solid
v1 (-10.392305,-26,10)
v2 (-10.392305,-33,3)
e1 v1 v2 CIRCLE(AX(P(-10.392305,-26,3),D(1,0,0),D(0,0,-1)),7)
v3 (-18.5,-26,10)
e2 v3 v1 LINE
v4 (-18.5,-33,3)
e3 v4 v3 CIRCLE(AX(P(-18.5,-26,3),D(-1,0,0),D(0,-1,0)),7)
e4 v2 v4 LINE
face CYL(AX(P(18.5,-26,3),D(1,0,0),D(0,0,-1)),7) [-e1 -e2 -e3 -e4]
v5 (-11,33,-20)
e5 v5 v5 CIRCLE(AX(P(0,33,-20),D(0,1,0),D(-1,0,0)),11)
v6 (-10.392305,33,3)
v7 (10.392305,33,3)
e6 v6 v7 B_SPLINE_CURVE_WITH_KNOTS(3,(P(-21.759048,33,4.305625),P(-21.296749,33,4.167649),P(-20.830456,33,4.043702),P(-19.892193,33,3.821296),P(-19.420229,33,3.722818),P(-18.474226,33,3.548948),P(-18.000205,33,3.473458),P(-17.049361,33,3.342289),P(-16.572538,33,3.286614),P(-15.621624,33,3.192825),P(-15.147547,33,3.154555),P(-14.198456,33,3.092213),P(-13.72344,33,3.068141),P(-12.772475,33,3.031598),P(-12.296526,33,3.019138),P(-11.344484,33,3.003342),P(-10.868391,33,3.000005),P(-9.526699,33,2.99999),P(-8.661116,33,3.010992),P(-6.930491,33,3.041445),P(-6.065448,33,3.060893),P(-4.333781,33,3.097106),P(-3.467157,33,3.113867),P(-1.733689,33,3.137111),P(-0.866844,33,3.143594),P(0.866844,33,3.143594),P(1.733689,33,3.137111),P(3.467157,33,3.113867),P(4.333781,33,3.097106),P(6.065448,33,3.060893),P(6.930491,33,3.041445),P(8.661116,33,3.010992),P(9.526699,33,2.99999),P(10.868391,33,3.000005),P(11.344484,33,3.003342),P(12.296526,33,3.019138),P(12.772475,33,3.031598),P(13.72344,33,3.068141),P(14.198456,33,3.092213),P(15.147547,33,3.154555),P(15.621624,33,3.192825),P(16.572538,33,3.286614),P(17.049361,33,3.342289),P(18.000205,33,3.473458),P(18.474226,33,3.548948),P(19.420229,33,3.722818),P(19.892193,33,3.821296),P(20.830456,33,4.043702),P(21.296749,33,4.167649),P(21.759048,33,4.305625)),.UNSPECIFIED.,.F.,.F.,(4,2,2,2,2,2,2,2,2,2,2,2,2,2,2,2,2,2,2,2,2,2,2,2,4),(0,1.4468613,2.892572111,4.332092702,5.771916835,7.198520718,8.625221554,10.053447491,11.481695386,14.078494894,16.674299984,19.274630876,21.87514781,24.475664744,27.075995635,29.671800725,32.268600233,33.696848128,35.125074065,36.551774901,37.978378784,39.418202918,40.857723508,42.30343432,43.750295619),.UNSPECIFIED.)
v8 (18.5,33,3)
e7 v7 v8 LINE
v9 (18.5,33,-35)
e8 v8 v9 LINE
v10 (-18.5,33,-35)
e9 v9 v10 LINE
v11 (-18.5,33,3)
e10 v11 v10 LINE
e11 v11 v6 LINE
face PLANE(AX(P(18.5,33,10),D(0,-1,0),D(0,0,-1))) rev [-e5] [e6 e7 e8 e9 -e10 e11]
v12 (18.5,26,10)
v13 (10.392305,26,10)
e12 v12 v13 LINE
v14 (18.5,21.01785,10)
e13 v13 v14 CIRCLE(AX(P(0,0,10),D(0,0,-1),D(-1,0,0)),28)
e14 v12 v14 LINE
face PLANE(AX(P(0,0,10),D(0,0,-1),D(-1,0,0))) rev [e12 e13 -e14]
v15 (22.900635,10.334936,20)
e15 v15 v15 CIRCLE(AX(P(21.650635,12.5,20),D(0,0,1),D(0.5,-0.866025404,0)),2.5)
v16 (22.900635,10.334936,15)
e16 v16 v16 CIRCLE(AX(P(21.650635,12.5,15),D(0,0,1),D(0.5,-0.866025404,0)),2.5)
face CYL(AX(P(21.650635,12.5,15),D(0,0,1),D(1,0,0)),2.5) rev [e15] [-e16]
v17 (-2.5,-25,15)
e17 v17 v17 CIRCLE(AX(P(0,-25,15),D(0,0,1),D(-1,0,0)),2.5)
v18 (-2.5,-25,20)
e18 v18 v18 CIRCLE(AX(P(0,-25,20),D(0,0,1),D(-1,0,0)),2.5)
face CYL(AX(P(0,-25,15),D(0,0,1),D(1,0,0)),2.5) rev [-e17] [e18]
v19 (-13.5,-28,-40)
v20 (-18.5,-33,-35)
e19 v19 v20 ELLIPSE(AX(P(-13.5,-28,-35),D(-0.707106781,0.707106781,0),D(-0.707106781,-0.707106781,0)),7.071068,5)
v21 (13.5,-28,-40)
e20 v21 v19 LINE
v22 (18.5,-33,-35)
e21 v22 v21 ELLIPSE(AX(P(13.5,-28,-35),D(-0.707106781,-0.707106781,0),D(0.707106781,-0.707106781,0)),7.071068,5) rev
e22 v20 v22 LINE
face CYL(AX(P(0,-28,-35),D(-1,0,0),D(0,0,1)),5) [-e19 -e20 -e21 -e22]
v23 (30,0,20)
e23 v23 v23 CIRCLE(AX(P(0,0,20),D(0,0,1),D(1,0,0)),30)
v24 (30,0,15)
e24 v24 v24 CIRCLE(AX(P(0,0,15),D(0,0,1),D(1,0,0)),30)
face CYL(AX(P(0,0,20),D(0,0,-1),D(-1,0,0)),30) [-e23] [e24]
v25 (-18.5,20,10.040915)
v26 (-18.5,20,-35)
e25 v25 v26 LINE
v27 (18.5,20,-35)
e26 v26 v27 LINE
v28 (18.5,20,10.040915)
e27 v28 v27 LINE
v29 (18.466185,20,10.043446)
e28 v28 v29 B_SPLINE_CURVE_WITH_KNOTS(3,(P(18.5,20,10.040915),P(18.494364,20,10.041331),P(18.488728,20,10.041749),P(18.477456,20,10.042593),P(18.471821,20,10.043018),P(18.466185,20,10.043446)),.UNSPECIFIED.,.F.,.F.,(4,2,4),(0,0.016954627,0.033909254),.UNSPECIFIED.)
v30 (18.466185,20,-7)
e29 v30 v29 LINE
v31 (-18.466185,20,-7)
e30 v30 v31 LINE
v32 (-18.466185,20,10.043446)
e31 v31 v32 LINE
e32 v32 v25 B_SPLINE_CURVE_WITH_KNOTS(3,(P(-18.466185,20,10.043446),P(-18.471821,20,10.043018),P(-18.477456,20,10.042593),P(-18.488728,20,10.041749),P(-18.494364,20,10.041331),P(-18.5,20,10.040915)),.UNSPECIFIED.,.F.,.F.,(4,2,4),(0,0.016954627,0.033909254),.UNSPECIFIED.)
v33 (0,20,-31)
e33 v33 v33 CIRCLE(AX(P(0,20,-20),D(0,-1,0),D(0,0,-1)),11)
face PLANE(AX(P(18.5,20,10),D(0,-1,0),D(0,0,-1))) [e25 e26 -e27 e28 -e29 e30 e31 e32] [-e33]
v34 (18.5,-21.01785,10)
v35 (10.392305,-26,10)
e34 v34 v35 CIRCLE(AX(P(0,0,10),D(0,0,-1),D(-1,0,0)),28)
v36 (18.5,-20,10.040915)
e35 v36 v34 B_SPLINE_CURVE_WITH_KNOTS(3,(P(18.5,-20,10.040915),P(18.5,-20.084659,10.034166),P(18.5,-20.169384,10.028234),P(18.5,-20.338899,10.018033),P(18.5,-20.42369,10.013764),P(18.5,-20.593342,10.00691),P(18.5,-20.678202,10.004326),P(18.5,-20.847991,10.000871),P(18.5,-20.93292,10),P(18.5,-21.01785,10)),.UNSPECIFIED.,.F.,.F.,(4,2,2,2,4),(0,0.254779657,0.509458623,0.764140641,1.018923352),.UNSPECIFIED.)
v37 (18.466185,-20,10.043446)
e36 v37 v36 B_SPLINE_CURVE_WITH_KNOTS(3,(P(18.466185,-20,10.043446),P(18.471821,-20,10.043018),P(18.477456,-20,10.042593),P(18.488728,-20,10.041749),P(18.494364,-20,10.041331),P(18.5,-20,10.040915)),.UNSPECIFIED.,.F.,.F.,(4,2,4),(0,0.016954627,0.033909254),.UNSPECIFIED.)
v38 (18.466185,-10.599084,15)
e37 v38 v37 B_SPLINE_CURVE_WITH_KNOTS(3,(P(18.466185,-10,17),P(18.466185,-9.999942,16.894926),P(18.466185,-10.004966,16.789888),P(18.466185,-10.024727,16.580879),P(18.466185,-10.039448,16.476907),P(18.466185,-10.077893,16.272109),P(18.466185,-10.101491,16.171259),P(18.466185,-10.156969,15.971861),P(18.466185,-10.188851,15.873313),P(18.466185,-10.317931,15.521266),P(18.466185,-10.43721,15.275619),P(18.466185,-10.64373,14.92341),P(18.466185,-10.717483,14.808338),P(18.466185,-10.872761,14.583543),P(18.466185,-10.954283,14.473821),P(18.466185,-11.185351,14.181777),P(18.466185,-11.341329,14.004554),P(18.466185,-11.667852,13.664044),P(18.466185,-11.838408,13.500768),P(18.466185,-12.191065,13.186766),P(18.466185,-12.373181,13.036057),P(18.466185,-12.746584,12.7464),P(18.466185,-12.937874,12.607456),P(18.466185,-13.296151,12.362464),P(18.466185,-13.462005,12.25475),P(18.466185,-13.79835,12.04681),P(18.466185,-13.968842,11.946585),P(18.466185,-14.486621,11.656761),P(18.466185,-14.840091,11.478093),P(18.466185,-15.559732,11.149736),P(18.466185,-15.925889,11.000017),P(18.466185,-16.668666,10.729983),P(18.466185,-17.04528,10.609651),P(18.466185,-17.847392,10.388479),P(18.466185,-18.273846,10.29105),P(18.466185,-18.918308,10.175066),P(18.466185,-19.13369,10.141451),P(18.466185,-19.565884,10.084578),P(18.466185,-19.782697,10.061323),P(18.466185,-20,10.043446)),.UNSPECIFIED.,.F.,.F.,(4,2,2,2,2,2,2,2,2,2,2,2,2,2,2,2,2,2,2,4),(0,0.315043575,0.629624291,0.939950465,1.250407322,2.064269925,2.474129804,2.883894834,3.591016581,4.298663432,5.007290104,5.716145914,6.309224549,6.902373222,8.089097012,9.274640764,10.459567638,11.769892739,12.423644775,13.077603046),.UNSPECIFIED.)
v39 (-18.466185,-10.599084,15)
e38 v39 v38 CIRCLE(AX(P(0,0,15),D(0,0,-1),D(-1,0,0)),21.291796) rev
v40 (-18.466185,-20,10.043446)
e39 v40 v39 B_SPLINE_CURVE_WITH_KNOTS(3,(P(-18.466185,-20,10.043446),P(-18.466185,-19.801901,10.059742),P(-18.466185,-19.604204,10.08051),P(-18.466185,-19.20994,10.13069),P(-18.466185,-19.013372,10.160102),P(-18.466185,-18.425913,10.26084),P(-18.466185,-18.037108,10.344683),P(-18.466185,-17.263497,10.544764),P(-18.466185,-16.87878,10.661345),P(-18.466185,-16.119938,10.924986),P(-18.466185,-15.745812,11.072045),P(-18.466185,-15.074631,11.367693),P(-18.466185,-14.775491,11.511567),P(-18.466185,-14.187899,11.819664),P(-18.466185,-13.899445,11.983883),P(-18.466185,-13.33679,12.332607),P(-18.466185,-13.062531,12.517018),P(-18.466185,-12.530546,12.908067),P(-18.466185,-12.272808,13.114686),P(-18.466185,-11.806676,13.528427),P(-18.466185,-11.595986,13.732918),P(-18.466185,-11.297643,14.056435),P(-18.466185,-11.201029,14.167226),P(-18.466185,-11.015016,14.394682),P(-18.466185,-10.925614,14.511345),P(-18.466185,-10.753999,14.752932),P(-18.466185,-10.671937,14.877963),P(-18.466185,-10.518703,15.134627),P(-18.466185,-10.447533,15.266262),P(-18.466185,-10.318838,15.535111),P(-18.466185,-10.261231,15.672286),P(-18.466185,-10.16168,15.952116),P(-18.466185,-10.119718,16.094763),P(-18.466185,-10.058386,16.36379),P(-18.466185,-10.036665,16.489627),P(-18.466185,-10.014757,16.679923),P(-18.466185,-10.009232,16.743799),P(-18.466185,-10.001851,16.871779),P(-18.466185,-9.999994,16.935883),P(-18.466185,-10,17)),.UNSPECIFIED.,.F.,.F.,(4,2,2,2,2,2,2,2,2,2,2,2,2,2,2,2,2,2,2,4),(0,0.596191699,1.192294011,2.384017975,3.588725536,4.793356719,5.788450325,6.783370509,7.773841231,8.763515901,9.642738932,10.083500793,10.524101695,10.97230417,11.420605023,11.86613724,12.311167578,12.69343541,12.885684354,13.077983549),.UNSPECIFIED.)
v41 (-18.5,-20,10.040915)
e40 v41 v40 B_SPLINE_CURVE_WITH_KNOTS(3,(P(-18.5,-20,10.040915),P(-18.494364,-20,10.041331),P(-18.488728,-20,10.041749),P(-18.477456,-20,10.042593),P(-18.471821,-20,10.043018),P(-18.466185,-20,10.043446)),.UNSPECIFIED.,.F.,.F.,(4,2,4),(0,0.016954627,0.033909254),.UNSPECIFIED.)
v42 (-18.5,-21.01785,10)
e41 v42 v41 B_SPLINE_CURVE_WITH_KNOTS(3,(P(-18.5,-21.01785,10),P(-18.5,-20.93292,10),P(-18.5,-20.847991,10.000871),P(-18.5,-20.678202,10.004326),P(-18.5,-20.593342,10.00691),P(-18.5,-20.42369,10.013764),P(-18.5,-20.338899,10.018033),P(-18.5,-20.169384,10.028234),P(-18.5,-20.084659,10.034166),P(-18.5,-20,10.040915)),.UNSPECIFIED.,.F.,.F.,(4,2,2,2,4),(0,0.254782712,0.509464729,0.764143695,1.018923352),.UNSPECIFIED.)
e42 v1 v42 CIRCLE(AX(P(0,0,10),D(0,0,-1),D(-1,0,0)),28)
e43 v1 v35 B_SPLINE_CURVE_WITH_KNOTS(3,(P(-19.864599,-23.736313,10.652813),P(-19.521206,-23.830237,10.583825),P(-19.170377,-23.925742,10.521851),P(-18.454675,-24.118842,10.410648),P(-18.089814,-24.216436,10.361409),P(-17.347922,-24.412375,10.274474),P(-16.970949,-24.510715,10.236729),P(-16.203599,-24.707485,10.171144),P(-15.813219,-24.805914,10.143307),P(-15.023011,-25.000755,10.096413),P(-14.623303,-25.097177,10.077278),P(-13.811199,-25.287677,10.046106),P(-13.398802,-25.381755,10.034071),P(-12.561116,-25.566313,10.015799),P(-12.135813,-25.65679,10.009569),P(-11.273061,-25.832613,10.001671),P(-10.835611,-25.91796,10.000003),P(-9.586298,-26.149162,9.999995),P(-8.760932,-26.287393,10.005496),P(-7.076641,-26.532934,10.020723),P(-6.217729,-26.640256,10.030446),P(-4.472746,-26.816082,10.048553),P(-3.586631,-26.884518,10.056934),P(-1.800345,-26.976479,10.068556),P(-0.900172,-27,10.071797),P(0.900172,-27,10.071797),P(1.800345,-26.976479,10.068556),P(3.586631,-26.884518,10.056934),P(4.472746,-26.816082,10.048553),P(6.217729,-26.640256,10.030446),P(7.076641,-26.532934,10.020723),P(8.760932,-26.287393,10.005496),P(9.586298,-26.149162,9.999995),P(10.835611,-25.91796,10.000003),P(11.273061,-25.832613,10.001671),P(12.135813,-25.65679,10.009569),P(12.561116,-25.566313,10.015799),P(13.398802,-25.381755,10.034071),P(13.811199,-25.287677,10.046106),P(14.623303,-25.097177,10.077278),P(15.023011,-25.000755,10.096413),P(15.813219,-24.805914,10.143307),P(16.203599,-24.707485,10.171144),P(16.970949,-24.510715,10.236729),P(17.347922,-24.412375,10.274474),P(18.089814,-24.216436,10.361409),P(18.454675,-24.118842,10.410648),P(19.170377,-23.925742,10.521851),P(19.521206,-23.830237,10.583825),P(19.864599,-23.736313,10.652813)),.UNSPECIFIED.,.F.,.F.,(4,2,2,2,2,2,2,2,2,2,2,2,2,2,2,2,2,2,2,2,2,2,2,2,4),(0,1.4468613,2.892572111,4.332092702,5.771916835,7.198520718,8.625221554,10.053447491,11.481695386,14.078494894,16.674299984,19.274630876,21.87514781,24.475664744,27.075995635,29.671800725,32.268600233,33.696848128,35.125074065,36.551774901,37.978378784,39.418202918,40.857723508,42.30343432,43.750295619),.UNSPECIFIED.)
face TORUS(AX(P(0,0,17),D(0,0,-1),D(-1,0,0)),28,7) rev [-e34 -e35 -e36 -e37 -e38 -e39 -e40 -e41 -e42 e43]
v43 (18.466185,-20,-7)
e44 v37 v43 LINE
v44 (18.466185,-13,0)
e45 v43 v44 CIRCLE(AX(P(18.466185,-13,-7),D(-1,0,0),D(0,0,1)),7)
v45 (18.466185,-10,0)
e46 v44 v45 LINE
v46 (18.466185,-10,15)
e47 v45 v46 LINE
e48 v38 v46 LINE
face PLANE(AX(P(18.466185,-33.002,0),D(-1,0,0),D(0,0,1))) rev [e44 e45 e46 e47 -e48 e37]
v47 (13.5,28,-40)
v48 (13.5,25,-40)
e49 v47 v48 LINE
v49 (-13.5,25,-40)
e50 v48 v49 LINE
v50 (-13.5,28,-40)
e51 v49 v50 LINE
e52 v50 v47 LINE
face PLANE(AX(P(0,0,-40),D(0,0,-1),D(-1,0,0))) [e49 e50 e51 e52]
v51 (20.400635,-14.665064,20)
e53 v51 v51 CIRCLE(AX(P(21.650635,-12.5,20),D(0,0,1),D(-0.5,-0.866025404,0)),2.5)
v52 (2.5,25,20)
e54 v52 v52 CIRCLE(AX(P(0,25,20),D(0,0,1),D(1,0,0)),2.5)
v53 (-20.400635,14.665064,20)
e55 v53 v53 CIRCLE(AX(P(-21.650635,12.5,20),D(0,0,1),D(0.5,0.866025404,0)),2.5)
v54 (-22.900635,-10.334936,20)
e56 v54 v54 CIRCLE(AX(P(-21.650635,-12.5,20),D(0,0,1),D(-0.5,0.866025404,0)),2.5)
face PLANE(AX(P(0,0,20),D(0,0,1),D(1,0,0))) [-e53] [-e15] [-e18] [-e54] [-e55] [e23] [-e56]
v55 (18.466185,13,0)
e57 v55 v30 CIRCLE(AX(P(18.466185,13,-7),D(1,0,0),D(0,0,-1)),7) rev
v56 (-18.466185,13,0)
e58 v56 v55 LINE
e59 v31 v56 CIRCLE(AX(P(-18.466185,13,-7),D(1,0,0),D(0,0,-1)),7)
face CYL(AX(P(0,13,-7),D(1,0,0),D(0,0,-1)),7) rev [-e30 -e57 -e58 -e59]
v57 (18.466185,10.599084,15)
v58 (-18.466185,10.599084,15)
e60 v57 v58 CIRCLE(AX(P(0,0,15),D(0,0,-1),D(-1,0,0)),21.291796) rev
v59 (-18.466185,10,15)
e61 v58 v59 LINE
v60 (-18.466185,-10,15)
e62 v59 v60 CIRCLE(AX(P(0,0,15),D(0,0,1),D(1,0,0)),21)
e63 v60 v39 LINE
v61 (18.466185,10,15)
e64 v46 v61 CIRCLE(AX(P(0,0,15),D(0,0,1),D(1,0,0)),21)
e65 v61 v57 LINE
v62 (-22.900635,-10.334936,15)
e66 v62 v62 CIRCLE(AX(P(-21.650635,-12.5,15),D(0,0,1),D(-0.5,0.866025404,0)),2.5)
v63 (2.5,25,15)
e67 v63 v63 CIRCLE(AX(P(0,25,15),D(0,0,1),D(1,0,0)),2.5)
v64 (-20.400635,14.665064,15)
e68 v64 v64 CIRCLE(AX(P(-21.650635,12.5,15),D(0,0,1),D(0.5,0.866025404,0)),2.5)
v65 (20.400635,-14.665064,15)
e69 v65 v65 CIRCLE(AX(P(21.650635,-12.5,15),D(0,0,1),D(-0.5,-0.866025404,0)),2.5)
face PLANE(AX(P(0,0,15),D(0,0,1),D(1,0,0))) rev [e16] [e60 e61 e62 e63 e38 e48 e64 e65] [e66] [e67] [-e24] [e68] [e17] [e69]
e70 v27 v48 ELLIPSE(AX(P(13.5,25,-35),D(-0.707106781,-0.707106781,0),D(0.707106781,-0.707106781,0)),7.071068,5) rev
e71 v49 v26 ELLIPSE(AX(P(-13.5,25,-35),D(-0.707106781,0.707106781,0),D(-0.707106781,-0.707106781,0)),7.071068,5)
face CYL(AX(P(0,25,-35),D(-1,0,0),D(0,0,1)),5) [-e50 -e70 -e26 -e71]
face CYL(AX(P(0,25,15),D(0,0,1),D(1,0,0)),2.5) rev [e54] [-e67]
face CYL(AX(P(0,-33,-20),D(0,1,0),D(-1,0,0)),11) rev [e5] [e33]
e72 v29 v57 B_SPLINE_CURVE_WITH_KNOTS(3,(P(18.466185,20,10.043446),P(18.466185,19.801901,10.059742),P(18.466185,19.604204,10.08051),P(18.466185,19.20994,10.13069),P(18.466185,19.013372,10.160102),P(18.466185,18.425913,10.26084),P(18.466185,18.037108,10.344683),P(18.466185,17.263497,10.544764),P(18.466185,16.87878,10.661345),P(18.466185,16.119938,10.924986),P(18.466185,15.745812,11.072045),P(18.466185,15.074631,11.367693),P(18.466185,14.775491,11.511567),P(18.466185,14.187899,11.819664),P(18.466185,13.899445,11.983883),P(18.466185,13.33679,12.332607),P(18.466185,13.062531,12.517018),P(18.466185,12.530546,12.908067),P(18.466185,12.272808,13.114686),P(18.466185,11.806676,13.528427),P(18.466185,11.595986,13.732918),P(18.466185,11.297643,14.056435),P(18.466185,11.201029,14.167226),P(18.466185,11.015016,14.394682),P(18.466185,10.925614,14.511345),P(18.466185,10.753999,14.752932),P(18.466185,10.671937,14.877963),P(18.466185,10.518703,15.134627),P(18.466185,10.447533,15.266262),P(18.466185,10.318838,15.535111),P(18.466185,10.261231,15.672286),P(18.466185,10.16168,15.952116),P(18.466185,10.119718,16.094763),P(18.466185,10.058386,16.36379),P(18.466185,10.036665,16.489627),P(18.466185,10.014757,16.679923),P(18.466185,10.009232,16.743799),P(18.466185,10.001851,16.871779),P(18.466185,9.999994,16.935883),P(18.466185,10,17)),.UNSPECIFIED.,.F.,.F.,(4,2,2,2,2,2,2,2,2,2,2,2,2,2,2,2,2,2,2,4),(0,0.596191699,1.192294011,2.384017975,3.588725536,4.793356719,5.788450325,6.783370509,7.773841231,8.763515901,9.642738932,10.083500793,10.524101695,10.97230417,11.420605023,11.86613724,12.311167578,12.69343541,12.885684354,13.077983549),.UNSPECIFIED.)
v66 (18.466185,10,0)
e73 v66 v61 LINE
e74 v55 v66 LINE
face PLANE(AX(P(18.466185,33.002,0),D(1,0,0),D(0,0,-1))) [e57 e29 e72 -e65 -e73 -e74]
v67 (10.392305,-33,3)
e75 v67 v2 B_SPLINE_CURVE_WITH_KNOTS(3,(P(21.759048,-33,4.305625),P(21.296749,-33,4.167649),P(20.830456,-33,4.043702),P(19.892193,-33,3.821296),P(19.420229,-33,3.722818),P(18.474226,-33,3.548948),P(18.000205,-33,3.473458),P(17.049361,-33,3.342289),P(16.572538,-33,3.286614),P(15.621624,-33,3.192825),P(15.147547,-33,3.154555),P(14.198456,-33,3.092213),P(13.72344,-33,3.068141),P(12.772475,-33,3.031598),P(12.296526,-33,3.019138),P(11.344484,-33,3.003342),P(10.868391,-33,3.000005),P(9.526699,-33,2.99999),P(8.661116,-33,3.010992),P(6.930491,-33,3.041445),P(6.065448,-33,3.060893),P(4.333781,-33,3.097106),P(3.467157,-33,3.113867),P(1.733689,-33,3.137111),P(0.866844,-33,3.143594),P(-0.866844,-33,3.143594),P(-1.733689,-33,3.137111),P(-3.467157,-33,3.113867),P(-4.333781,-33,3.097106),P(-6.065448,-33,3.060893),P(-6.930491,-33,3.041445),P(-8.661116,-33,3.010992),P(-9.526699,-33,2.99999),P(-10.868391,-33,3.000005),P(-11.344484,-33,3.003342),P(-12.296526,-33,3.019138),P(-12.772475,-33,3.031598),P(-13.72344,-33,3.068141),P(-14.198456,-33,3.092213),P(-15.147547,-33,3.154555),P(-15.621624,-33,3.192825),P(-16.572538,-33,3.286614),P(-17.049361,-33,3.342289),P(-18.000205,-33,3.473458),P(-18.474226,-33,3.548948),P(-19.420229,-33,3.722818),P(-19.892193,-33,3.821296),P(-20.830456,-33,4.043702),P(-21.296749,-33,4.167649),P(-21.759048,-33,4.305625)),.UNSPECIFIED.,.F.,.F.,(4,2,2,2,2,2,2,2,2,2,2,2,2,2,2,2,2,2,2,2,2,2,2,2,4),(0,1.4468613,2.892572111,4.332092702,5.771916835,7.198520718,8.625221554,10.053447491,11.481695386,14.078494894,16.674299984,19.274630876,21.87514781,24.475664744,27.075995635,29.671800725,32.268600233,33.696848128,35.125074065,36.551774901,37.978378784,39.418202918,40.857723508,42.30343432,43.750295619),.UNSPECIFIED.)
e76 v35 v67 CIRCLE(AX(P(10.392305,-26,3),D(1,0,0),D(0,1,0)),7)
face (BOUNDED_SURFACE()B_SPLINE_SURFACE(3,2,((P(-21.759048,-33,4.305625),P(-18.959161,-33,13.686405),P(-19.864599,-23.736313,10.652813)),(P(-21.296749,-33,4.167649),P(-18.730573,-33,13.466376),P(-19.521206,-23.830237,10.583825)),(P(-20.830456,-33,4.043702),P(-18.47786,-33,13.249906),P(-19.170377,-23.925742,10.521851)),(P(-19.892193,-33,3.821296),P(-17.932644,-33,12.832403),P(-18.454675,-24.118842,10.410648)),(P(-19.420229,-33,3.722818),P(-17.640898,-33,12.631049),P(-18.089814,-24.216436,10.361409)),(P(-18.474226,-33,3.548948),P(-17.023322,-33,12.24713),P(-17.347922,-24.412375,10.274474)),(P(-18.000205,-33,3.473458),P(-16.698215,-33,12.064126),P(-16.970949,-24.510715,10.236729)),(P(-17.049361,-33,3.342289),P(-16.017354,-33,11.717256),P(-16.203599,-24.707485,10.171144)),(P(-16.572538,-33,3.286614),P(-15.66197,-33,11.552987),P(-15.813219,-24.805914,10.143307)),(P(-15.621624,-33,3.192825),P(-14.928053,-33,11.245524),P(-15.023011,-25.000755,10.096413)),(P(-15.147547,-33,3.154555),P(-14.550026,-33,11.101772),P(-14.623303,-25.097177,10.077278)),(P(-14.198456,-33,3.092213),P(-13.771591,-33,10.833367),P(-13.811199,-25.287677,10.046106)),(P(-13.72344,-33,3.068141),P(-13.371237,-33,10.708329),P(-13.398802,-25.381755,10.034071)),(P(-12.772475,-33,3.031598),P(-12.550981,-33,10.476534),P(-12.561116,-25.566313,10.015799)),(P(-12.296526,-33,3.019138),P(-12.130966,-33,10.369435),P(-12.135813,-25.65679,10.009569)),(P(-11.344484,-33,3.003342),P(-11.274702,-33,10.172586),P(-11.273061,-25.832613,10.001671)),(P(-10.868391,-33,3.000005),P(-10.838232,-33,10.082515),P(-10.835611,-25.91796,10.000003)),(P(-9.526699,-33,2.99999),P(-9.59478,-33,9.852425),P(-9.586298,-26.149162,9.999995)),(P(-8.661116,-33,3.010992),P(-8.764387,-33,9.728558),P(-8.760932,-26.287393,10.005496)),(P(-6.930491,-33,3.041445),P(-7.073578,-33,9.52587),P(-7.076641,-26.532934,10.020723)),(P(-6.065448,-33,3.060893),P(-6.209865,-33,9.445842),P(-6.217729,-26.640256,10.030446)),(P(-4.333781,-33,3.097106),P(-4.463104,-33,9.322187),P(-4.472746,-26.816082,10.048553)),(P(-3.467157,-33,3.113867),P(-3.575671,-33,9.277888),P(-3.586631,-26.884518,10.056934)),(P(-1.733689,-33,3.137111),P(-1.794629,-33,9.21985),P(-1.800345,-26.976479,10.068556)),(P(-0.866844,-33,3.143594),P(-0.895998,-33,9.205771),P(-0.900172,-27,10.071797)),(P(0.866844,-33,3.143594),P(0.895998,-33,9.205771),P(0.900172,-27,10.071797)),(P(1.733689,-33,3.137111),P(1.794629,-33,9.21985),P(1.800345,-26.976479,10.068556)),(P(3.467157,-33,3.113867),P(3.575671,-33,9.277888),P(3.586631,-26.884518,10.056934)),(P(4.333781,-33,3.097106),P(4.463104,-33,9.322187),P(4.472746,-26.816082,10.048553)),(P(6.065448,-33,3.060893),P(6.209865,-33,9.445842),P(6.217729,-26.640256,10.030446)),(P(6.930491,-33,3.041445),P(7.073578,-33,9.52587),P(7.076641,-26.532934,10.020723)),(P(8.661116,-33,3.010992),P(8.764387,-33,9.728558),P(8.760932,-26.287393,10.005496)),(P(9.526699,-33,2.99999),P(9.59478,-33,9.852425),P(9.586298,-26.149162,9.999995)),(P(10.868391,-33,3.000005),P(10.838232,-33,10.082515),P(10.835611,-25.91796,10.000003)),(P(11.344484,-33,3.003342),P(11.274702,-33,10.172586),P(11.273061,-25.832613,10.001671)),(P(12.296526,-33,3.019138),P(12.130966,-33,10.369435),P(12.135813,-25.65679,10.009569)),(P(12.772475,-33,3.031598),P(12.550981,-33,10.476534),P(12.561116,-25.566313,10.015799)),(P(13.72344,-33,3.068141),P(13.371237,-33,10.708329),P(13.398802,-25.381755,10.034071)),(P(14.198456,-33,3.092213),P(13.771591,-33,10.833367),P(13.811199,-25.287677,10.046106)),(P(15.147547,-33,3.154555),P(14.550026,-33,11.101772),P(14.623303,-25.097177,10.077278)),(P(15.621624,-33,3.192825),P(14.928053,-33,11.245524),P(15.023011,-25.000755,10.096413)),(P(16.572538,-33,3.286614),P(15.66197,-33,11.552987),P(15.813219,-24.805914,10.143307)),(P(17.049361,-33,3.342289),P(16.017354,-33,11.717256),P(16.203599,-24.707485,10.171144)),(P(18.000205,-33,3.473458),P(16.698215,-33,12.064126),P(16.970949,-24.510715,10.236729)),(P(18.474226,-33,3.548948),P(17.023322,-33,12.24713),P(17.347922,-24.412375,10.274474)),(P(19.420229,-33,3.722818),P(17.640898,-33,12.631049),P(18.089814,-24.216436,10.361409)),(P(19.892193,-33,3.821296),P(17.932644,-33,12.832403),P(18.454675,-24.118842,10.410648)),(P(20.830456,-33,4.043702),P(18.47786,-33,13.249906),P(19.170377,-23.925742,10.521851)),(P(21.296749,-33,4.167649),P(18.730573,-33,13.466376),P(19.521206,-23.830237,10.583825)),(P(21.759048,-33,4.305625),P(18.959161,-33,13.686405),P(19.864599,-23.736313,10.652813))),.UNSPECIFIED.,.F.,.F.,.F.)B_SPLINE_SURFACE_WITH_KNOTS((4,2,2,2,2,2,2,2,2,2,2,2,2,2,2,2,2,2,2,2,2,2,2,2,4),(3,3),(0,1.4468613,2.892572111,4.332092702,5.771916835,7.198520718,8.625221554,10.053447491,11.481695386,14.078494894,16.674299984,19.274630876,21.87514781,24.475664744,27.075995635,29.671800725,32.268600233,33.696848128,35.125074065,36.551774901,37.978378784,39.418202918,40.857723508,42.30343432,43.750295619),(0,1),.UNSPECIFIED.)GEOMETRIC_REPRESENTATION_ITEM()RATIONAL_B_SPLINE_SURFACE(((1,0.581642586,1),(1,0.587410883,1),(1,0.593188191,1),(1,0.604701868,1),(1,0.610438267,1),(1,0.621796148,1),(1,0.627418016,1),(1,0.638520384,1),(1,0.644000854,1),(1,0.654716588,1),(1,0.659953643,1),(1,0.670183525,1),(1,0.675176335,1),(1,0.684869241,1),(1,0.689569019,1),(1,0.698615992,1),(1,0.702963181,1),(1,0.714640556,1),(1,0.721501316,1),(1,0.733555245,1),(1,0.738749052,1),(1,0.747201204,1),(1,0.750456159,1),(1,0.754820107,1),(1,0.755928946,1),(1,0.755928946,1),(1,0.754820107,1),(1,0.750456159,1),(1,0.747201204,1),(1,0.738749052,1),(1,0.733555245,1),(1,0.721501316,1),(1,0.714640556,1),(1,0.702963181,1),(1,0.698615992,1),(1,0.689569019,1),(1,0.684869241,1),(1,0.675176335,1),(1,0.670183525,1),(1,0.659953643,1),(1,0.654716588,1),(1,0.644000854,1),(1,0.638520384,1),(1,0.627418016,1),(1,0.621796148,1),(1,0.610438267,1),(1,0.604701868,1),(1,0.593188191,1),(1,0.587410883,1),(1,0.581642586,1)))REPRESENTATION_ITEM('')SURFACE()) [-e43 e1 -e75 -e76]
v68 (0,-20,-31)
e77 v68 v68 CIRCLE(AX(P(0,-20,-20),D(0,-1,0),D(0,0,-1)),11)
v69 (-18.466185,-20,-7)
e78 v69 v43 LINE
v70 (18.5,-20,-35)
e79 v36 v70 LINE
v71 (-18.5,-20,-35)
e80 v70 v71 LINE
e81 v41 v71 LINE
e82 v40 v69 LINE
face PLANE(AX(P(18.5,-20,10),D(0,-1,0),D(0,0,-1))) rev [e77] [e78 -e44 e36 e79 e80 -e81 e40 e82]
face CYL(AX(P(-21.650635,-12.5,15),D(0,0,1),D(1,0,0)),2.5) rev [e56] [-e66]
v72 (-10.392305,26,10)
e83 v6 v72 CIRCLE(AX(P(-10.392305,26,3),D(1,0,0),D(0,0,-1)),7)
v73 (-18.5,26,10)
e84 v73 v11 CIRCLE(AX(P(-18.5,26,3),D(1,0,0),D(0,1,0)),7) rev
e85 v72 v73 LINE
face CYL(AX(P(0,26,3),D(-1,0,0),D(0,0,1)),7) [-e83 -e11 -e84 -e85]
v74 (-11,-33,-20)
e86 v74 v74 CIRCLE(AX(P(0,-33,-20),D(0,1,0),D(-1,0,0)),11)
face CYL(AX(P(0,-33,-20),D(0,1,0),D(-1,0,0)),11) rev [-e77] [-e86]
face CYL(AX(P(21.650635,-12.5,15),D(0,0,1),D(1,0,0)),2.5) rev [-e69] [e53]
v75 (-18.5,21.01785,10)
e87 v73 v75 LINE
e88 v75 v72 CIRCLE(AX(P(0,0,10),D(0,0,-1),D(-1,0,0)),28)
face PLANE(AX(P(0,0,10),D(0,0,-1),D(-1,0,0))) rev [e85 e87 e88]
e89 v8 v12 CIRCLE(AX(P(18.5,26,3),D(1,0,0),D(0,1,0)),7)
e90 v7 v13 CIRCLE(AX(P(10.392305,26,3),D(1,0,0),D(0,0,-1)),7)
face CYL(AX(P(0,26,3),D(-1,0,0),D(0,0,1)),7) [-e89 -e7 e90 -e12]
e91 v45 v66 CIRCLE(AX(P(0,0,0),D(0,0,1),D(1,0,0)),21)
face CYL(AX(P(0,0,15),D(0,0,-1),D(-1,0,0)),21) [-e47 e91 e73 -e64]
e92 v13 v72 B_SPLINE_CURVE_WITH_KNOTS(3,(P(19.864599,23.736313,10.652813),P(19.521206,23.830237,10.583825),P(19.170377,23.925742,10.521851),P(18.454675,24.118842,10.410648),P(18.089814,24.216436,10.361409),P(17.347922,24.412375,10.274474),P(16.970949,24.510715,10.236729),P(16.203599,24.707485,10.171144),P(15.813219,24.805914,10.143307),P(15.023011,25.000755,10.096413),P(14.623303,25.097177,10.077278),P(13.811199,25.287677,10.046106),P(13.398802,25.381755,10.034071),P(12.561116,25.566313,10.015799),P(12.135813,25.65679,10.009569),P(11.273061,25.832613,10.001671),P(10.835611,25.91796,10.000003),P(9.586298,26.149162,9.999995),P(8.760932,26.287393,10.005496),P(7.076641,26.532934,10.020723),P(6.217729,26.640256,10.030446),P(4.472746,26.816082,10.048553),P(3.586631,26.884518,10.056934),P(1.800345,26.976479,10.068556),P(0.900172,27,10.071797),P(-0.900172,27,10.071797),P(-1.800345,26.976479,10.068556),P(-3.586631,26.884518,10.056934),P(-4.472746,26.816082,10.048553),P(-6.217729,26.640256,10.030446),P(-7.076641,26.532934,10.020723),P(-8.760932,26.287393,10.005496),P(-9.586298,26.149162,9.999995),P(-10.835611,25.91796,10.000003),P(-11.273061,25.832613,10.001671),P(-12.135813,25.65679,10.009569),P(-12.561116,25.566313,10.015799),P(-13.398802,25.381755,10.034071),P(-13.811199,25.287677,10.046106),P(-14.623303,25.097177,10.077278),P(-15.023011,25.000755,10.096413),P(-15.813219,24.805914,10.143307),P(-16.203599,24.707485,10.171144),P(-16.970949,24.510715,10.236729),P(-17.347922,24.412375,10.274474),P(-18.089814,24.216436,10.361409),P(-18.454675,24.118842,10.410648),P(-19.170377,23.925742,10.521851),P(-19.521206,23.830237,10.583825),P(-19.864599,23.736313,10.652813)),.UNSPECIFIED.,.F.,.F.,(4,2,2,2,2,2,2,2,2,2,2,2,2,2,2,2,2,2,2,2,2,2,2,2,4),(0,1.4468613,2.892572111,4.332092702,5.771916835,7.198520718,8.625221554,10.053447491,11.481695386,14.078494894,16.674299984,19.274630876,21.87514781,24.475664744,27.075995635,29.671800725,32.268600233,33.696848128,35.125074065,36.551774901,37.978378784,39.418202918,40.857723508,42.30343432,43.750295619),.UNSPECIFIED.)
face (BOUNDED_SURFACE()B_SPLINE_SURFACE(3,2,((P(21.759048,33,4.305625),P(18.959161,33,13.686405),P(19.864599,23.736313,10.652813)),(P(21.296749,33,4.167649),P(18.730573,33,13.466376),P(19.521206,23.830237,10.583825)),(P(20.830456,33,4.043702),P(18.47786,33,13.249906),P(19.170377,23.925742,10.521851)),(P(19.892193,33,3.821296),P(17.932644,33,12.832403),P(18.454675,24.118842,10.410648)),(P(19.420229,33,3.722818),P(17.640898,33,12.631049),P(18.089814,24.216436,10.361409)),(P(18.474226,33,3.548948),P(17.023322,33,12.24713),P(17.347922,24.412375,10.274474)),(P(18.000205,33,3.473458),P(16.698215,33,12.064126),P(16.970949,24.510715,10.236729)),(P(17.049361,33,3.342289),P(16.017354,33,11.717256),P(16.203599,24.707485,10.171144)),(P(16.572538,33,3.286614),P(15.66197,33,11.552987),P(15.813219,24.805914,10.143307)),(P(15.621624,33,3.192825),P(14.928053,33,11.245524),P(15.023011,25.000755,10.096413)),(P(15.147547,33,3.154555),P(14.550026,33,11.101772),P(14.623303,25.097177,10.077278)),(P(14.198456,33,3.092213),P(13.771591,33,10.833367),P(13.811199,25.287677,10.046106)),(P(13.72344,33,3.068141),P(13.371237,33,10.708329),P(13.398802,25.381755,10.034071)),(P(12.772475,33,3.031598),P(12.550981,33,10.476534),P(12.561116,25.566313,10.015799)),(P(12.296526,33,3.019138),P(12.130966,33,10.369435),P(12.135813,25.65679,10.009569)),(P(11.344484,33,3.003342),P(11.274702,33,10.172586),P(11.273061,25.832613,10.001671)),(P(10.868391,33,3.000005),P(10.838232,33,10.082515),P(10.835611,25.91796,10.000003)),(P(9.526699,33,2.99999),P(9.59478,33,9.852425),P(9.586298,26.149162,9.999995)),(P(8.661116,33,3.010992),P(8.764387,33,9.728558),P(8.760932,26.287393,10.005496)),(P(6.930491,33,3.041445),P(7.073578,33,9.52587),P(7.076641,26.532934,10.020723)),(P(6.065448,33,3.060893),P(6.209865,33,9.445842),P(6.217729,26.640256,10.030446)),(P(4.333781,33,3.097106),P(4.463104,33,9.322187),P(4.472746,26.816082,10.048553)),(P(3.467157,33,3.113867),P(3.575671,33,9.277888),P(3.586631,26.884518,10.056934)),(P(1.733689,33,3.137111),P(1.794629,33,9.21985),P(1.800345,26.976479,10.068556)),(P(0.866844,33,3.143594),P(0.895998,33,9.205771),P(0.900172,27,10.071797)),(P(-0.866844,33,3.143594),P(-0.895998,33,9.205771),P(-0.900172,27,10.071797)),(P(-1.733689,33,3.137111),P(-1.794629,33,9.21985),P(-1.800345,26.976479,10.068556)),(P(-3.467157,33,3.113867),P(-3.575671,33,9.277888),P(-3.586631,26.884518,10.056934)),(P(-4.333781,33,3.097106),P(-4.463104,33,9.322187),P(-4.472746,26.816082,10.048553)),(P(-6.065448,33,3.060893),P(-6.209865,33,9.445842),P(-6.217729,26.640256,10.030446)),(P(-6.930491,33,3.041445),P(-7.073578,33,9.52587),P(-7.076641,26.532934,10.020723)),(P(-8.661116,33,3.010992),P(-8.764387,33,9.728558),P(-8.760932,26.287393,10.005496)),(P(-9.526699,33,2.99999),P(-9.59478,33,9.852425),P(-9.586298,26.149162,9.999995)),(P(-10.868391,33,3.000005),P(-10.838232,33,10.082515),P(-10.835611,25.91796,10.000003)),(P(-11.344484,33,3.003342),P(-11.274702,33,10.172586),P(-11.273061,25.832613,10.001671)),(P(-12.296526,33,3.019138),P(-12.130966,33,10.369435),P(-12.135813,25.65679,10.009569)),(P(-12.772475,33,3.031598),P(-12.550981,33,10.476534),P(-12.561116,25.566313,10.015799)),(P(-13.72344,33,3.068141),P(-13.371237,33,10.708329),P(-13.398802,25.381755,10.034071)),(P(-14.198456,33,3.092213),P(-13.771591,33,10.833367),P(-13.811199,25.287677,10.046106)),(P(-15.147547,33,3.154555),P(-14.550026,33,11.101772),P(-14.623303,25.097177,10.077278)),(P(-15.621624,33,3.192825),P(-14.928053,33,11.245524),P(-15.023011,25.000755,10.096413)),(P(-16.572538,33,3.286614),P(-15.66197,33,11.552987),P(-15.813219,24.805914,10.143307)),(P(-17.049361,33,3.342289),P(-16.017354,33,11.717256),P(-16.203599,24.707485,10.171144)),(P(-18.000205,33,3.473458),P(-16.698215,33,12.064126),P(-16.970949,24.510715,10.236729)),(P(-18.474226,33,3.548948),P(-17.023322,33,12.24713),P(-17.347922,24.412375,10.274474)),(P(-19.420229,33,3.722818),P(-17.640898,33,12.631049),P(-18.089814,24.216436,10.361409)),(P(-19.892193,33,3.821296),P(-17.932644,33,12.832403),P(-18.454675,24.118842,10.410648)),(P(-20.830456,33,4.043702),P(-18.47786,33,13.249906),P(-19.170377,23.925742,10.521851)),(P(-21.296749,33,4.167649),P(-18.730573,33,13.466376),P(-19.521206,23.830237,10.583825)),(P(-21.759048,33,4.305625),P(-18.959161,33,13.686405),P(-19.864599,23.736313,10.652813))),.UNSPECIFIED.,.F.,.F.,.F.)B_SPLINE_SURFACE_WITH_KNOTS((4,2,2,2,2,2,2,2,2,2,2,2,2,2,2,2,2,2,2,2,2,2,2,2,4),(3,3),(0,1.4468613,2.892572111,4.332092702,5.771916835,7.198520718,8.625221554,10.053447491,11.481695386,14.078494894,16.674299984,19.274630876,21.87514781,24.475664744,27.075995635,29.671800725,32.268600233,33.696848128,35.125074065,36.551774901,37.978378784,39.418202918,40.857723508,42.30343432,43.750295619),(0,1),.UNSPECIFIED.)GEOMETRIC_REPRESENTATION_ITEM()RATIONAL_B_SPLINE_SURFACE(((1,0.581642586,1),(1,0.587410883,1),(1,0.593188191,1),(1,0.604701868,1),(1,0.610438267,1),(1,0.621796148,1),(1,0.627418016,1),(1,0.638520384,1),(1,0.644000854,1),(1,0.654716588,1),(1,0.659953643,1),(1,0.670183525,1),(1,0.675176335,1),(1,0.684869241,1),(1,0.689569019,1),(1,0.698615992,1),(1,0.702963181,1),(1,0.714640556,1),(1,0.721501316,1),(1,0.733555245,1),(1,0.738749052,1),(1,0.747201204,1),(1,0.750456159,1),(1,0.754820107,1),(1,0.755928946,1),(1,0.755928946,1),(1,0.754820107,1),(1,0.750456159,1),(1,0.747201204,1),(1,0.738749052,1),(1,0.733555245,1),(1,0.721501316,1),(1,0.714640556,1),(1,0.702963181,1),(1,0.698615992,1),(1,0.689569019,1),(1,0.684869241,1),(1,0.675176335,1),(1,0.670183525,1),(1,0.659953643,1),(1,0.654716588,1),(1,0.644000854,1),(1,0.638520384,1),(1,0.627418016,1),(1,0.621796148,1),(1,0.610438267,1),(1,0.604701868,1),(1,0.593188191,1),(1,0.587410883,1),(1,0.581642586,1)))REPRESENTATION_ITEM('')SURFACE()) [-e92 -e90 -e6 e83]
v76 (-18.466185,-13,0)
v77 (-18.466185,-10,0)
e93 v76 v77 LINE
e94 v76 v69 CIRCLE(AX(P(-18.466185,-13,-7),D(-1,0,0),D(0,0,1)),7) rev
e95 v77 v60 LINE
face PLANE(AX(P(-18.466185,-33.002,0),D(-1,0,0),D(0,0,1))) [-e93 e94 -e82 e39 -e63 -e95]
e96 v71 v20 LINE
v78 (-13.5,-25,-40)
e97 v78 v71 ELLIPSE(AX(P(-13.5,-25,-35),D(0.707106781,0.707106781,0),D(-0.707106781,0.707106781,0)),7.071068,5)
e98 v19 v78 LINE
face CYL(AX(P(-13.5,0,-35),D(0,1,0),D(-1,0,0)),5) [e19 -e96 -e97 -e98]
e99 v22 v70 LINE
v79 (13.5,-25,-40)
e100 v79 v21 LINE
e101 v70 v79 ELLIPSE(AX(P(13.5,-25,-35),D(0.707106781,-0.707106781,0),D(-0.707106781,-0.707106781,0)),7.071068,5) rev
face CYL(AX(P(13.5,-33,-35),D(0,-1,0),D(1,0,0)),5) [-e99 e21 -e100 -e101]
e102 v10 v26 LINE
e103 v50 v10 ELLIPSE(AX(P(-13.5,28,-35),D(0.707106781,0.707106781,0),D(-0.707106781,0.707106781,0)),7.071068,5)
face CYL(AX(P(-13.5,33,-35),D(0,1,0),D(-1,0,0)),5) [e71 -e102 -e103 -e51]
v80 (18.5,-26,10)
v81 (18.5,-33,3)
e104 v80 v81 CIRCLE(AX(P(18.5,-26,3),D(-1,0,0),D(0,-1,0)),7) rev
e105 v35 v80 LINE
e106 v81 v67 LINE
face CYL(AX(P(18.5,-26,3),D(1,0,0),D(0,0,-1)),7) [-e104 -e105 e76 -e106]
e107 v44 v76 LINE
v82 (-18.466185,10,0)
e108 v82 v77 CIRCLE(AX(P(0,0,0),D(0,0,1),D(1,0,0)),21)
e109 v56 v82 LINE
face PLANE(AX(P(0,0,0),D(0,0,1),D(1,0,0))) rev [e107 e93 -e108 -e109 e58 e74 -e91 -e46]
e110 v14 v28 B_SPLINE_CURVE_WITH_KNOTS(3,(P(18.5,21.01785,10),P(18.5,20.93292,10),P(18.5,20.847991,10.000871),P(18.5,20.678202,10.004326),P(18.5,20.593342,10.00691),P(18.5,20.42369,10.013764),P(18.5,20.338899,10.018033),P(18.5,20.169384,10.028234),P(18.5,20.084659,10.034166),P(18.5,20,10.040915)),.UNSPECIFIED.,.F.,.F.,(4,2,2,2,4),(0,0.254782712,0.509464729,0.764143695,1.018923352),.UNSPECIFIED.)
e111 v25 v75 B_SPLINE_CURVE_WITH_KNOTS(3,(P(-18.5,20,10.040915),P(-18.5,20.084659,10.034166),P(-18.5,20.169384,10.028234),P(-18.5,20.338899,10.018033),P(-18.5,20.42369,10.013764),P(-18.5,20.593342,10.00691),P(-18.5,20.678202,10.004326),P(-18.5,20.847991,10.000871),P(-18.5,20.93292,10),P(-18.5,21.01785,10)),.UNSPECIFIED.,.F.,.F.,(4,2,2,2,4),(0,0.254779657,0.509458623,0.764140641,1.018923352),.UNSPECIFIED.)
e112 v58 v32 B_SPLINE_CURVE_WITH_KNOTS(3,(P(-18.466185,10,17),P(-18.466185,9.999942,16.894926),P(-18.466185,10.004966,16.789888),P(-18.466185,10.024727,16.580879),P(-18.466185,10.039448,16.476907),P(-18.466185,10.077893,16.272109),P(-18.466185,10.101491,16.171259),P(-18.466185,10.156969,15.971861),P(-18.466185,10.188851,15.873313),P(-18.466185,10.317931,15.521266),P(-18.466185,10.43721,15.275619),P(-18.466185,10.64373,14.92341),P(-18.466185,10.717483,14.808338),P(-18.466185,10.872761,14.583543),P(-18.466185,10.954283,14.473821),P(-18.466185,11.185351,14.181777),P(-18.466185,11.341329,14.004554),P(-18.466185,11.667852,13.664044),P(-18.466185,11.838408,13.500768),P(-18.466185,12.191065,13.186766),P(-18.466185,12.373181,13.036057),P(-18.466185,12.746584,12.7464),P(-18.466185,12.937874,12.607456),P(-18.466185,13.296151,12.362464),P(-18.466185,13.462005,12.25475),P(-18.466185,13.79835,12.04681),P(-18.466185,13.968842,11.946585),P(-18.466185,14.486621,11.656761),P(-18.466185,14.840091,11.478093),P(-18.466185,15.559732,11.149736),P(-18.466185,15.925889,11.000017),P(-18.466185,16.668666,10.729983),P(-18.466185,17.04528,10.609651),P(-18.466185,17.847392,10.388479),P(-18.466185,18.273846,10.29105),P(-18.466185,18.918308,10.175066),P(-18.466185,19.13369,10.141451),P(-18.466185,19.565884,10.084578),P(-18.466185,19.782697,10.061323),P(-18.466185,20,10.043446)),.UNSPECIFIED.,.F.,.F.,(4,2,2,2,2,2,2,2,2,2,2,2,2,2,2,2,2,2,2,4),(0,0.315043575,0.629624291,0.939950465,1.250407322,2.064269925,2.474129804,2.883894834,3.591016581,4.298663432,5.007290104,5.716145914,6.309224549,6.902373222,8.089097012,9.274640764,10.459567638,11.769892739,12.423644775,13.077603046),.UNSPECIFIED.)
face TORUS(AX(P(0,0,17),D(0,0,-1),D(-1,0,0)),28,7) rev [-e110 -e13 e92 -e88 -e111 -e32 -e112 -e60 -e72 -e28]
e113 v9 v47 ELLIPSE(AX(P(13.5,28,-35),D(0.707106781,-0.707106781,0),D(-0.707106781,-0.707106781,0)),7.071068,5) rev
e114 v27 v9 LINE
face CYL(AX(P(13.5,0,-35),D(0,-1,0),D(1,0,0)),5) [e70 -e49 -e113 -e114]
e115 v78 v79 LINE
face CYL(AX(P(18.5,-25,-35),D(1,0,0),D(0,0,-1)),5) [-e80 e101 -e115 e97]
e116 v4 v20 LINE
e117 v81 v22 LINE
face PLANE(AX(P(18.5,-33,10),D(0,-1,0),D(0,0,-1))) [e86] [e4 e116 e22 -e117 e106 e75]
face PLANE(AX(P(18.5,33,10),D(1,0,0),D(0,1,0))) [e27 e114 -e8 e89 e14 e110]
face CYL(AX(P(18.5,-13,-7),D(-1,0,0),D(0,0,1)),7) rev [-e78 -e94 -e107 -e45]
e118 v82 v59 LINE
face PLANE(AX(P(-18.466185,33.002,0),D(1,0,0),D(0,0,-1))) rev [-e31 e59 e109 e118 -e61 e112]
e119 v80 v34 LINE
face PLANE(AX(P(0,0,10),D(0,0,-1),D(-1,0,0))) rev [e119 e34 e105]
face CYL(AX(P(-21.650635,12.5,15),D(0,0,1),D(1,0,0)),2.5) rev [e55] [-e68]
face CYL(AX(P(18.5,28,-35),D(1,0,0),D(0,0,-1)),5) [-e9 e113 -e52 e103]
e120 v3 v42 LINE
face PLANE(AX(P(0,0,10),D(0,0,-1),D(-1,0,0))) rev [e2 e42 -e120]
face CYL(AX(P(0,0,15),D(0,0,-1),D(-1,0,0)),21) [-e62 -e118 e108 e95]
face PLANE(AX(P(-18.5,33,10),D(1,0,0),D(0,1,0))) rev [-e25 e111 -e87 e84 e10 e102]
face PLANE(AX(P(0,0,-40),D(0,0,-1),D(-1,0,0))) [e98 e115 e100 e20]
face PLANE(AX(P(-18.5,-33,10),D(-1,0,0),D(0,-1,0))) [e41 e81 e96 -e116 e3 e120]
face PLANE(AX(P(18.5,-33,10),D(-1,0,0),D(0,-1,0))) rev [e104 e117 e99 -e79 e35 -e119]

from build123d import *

# Parameters (mm, degrees)
SZKIC1_R                    = 21
DODANIE_WYCI_GNI_CIE1_DEPTH = 15
SZKIC6_R                    = 30
DODANIE_WYCI_GNI_CIE3_DEPTH = 5
SZKIC7_R                    = 2.5
WYTNIJ_WYCI_GNI_CIE2_DEPTH  = 5
SZYK_KO_OWY1_COUNT          = 6
SZKIC8_W                    = 37
SZKIC8_H                    = 13
DODANIE_WYCI_GNI_CIE4_DEPTH = 50
SZKIC9_W                    = 36.932370626
SZKIC9_H                    = 10
DODANIE_WYCI_GNI_CIE5_DEPTH = 10
ZAOKR_GLENIE1_R             = 7
ZAOKR_GLENIE2_R             = 7
SZKIC10_R                   = 11
WYTNIJ_WYCI_GNI_CIE3_DEPTH  = 83.800966306
ZAOKR_GLENIE3_R             = 5


# Read off the part's stored shape, not the designer's step: Lustro1
with BuildPart() as part:
    # Szkic1 → Dodanie-wyciągnięcie1 (new body)
    with BuildSketch(Plane.XY):
        Circle(SZKIC1_R)
    extrude(amount=DODANIE_WYCI_GNI_CIE1_DEPTH)

    # Szkic6 → Dodanie-wyciągnięcie3 (add)
    with BuildSketch(Plane.XY.offset(15)):
        Circle(SZKIC6_R)
    extrude(amount=DODANIE_WYCI_GNI_CIE3_DEPTH)

    # Szkic7 → Wytnij-wyciągnięcie2 (cut)
    with BuildSketch(Plane.XY.offset(20)):
        with Locations((0, 25)):
            Circle(SZKIC7_R)
    wytnij_wyci_gni_cie2 = extrude(amount=-WYTNIJ_WYCI_GNI_CIE2_DEPTH, mode=Mode.SUBTRACT)

    # Szyk kołowy1: Wytnij-wyciągnięcie2 ×6 about axis
    szyk_ko_owy1_axis = Axis((0, 0, 0), (0, 0, 1))
    for i in range(1, SZYK_KO_OWY1_COUNT):
        add(wytnij_wyci_gni_cie2.rotate(szyk_ko_owy1_axis, i * 360 / SZYK_KO_OWY1_COUNT), mode=Mode.SUBTRACT)

    # Szkic8 → Dodanie-wyciągnięcie4 (add)
    with BuildSketch(Plane(origin=(0, 0, -40), x_dir=(-1, 0, 0), z_dir=(0, 0, -1))):
        with Locations((0, 26.5)):
            Rectangle(SZKIC8_W, SZKIC8_H)
    extrude(amount=-DODANIE_WYCI_GNI_CIE4_DEPTH)

    # Szkic9 → Dodanie-wyciągnięcie5 (add)
    with BuildSketch(Plane(origin=(0, 10, 0), x_dir=(1, 0, 0), z_dir=(0, 1, 0))):
        with Locations((0, -5)):
            Rectangle(SZKIC9_W, SZKIC9_H)
    extrude(amount=DODANIE_WYCI_GNI_CIE5_DEPTH)

    # Zaokrąglenie1
    # the kernel refuses this fillet: 7 mm, written as the material it adds along each edge
    with BuildSketch(Plane(origin=(-18.466185313, 20, 0), x_dir=(0, 0, -1), z_dir=(1, 0, 0))) as zaokr_glenie1_piece_1:
        with BuildLine():
            CenterArc((ZAOKR_GLENIE1_R, -ZAOKR_GLENIE1_R), ZAOKR_GLENIE1_R, 90, 90)
            Line((0, -ZAOKR_GLENIE1_R), (0, 0))
            Line((0, 0), (ZAOKR_GLENIE1_R, 0))
        make_face()
    extrude(amount=36.932370625)
    with BuildSketch(Plane(origin=(0, 0, 10), x_dir=(0.9435381877974668, -0.33126377430662773, 0), z_dir=(-0.33126377430662773, -0.9435381877974668, 0))) as zaokr_glenie1_piece_2_section:
        with BuildLine():
            CenterArc((21 + ZAOKR_GLENIE1_R, ZAOKR_GLENIE1_R), ZAOKR_GLENIE1_R, 180, 90)
            Line((21 + ZAOKR_GLENIE1_R, 0), (21, 0))
            Line((21, 0), (21, ZAOKR_GLENIE1_R))
        make_face()
    zaokr_glenie1_piece_2 = revolve(axis=Axis((0, 0, 10), (0, 0, 1)), revolution_arc=218.690998802, mode=Mode.PRIVATE)
    zaokr_glenie1_piece_2 = split(zaokr_glenie1_piece_2, bisect_by=Plane(origin=(18.482842321, 20, 10.012675599), z_dir=(0, 1, 0)), keep=Keep.TOP, mode=Mode.PRIVATE)
    zaokr_glenie1_piece_2 = split(zaokr_glenie1_piece_2, bisect_by=Plane(origin=(18.5, 20.258945845, 10.012675599), z_dir=(-1, 0, 0)), keep=Keep.TOP, mode=Mode.PRIVATE)
    zaokr_glenie1_piece_2 = split(zaokr_glenie1_piece_2, bisect_by=Plane(origin=(-18.5, 20.258945845, 10.012675599), z_dir=(1, 0, 0)), keep=Keep.TOP, mode=Mode.PRIVATE)
    add(zaokr_glenie1_piece_2)
    with BuildSketch(Plane(origin=(0, 0, 10), x_dir=(0.9435381877974668, -0.33126377430662773, 0), z_dir=(-0.33126377430662773, -0.9435381877974668, 0))) as zaokr_glenie1_piece_3_section:
        with BuildLine():
            CenterArc((21 + ZAOKR_GLENIE1_R, ZAOKR_GLENIE1_R), ZAOKR_GLENIE1_R, 180, 90)
            Line((21 + ZAOKR_GLENIE1_R, 0), (21, 0))
            Line((21, 0), (21, ZAOKR_GLENIE1_R))
        make_face()
    zaokr_glenie1_piece_3 = revolve(axis=Axis((0, 0, 10), (0, 0, 1)), revolution_arc=218.690998802, mode=Mode.PRIVATE)
    zaokr_glenie1_piece_3 = split(zaokr_glenie1_piece_3, bisect_by=Plane(origin=(18.466185313, 16.543061686, 11.724606468), z_dir=(-1, 0, 0)), keep=Keep.TOP, mode=Mode.PRIVATE)
    zaokr_glenie1_piece_3 = split(zaokr_glenie1_piece_3, bisect_by=Plane(origin=(-18.466185313, 16.543061686, 11.724606468), z_dir=(1, 0, 0)), keep=Keep.TOP, mode=Mode.PRIVATE)
    add(zaokr_glenie1_piece_3)

    # Zaokrąglenie2
    zaokr_glenie2_edges = [part.edges().sort_by_distance(p)[0] for p in [
        (0, 33, 10),
    ]]
    fillet(zaokr_glenie2_edges, radius=ZAOKR_GLENIE2_R)

    # Lustro1: part across plane


with BuildPart() as part_1:
    add(part.part)
    add(part.part.mirror(Plane.ZX))

    # Szkic10 → Wytnij-wyciągnięcie3 (cut, through all)
    with BuildSketch(Plane(origin=(0, 33, 0), x_dir=(1, 0, 0), z_dir=(0, 1, 0))):
        with Locations(Location((0, 20, 0), (0, 0, 180))):
            Circle(SZKIC10_R)
    extrude(amount=-WYTNIJ_WYCI_GNI_CIE3_DEPTH, mode=Mode.SUBTRACT)

    # Zaokrąglenie3
    zaokr_glenie3_edges = [part_1.edges().sort_by_distance(p)[0] for p in [
        (0, -20, -40),
        (18.5, -26.5, -40),
        (0, -33, -40),
        (-18.5, -26.5, -40),
        (0, 33, -40),
        (-18.5, 26.5, -40),
        (18.5, 26.5, -40),
        (0, 20, -40),
    ]]
    fillet(zaokr_glenie3_edges, radius=ZAOKR_GLENIE3_R)


solid = part_1.part
